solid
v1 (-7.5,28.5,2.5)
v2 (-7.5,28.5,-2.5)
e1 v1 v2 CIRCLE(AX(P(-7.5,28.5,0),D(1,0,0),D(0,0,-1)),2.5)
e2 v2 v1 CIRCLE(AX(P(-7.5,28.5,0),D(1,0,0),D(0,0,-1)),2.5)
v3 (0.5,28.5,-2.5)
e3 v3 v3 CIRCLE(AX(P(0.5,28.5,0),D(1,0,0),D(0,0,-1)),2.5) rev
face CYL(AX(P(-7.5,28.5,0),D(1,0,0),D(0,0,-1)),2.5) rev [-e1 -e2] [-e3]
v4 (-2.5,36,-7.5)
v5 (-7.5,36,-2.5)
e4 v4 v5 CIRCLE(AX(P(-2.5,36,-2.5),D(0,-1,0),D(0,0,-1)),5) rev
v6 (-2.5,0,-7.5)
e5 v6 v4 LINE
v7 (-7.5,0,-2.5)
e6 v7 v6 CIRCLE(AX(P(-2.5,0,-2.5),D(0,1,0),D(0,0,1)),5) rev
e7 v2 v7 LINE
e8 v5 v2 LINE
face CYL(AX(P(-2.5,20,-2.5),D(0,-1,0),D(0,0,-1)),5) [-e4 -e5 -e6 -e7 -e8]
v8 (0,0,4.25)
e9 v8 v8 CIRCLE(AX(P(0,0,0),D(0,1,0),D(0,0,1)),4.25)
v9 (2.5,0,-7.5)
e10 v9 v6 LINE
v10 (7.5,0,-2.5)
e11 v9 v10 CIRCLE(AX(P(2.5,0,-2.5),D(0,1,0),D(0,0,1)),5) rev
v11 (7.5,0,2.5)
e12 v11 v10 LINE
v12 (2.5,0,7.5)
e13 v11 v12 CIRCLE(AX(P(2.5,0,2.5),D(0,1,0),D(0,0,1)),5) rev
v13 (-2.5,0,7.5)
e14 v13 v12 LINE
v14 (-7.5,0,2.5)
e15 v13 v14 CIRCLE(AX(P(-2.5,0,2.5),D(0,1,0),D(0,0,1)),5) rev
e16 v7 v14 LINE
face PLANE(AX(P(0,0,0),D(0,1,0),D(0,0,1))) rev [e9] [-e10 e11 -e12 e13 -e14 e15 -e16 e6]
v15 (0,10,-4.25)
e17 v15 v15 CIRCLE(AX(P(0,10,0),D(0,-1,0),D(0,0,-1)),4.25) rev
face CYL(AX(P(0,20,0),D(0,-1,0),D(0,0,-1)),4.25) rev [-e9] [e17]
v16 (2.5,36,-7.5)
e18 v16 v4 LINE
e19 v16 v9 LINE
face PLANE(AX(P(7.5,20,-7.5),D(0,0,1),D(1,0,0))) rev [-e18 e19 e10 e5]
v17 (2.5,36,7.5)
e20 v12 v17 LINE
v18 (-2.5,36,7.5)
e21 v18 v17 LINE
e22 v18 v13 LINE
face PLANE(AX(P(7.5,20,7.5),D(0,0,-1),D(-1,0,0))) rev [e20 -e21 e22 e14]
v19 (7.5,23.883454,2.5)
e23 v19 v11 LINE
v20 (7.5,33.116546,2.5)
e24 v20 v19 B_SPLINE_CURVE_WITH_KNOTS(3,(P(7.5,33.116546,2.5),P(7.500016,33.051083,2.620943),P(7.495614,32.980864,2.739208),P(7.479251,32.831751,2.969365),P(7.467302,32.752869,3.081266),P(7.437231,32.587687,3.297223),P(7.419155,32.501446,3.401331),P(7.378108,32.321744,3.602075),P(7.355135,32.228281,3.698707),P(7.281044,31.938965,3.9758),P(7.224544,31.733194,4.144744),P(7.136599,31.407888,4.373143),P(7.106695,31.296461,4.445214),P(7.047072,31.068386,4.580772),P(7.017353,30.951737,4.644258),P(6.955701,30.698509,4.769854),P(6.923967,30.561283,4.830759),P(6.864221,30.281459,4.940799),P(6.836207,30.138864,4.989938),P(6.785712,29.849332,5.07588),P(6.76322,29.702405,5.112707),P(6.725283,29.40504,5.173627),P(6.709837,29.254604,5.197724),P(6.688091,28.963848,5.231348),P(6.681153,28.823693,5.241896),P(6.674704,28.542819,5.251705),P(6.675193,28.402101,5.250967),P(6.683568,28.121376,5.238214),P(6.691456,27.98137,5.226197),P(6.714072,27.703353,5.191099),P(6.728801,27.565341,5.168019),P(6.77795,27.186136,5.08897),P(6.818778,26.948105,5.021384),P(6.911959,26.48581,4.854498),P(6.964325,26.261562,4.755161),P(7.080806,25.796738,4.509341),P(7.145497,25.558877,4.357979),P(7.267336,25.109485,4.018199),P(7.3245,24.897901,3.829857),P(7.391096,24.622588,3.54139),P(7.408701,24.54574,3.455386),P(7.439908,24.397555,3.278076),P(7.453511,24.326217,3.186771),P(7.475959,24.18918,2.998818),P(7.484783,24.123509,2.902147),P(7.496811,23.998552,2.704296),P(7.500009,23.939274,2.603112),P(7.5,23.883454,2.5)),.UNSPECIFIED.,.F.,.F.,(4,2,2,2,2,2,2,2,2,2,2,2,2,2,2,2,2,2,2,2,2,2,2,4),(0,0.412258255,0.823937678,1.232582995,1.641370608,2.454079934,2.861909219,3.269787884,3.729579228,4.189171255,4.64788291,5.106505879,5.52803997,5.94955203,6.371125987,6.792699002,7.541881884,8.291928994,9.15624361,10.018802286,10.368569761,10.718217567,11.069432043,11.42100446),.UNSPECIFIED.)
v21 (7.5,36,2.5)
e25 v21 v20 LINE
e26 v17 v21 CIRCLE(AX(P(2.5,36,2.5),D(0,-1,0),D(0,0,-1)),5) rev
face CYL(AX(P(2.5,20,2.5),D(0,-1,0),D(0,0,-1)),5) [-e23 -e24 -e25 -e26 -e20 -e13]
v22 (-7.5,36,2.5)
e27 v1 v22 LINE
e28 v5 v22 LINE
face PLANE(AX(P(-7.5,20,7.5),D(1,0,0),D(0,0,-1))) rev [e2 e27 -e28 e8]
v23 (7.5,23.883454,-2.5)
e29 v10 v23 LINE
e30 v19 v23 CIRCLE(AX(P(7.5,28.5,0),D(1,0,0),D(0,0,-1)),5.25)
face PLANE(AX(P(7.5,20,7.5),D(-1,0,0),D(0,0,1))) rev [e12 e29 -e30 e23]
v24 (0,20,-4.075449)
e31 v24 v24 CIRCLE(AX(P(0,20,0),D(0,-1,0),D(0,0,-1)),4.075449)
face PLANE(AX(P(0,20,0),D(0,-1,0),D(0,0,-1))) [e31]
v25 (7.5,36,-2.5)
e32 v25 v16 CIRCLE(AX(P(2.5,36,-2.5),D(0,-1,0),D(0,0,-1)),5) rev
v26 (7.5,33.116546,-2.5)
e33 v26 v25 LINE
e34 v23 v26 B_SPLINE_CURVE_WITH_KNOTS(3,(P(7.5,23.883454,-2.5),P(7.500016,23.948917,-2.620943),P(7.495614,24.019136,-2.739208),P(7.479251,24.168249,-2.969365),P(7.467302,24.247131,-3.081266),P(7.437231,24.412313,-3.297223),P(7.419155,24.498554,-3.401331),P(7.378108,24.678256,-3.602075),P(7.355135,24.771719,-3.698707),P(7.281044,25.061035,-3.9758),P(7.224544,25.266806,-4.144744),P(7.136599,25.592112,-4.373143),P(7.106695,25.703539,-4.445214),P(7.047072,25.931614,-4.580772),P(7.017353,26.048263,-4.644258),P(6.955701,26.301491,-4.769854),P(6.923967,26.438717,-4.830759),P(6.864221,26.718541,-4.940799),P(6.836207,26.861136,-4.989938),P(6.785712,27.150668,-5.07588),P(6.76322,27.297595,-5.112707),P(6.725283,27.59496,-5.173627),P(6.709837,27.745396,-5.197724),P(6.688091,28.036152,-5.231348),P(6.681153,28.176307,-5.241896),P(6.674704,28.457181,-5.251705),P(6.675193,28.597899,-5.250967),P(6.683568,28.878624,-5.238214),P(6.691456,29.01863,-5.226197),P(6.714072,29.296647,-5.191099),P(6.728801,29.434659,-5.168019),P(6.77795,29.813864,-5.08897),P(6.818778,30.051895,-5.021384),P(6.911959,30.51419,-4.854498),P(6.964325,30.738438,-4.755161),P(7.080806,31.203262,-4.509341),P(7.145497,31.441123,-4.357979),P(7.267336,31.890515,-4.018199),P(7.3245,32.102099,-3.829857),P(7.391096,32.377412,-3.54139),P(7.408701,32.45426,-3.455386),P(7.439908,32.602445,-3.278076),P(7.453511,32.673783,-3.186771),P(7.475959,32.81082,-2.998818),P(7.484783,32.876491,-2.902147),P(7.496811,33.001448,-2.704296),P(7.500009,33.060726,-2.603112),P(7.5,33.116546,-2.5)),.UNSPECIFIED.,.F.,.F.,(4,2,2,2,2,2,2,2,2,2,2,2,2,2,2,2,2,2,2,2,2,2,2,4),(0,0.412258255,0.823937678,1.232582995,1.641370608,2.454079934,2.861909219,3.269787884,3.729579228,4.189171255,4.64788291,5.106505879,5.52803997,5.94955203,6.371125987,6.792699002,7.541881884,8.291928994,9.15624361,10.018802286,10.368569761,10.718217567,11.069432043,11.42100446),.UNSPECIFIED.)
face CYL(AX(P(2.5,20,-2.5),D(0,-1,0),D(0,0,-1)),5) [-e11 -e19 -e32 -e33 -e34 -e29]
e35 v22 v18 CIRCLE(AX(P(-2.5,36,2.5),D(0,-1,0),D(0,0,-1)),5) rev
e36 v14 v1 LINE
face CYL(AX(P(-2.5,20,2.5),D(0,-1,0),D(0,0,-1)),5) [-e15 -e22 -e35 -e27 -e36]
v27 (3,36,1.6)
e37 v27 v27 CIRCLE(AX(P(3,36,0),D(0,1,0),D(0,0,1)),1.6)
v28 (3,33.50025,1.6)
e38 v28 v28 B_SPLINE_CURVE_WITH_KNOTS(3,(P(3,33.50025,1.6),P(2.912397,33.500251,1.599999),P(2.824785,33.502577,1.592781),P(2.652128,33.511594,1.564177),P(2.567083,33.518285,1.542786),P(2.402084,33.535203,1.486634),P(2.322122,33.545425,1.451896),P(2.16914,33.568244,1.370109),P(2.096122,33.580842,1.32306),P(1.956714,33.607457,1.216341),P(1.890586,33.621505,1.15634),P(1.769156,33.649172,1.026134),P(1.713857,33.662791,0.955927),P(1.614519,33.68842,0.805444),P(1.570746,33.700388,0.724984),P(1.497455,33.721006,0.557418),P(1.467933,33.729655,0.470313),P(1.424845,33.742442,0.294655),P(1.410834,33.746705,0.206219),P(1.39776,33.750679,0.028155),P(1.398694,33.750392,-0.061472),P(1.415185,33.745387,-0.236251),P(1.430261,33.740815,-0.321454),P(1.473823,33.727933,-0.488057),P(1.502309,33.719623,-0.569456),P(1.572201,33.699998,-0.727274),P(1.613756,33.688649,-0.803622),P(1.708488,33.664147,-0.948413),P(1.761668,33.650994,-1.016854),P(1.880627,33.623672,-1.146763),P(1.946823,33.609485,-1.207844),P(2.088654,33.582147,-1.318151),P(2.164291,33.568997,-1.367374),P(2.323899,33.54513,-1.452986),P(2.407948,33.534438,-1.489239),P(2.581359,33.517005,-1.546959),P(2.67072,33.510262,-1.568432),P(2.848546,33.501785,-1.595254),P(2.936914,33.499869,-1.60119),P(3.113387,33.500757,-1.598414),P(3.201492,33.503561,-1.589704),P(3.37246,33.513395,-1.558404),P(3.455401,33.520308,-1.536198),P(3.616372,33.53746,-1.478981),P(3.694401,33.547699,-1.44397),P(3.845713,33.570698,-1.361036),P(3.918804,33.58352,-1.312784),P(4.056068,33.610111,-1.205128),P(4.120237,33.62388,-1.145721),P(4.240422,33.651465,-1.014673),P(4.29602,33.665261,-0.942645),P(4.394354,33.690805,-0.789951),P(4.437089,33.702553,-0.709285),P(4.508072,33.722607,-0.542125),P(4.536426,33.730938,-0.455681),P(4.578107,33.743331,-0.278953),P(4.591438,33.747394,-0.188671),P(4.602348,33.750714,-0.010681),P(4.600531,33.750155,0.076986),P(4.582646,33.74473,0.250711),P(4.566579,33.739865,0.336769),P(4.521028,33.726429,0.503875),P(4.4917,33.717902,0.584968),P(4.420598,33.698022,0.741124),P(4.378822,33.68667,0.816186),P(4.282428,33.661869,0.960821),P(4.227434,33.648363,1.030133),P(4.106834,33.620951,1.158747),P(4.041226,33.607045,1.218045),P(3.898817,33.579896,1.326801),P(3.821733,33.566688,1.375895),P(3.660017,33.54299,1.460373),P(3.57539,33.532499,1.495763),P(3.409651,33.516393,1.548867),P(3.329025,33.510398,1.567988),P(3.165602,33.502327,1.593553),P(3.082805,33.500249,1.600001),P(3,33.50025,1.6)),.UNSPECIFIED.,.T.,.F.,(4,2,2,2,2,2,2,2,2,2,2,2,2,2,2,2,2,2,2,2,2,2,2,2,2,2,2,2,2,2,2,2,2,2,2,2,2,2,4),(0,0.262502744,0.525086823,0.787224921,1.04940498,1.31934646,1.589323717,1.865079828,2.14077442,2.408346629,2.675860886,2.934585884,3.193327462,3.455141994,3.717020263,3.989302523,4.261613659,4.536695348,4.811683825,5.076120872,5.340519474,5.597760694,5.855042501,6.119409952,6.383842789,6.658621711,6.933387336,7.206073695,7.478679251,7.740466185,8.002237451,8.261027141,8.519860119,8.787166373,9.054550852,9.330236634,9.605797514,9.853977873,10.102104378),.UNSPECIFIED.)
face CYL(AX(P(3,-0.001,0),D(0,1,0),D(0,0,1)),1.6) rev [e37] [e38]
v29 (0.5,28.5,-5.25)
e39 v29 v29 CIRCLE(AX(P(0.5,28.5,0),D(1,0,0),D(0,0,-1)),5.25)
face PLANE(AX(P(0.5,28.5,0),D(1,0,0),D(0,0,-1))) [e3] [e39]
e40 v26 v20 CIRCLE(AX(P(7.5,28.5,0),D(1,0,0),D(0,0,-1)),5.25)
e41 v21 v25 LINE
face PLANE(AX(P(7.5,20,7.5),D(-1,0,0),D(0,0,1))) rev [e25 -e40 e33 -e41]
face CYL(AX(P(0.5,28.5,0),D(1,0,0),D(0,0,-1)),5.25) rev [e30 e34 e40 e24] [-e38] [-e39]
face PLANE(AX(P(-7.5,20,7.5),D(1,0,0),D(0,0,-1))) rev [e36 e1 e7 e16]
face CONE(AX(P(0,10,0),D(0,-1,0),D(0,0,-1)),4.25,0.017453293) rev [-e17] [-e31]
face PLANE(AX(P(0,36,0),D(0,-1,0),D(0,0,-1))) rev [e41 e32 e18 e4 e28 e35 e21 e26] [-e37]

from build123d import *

# Parameters (mm, degrees)
SKETCH1_W               = 15
SKETCH1_H               = 15
SKETCH1_R               = 4.25
BOSS_EXTRUDE1_DEPTH     = 20
SKETCH2_W               = 15
SKETCH2_H               = 15
BOSS_EXTRUDE2_DEPTH     = 16
SKETCH3_R               = 2.5
CUT_EXTRUDE1_DEPTH      = 40.714606885
FILLET1_R               = 5
SKETCH4_R               = 5.25
CUT_EXTRUDE2_DEPTH      = 7
CUT_EXTRUDE3_REACH      = 39.53
CUT_EXTRUDE3_END_RADIUS = 5.25
SKETCH5_R               = 1.6
CHAMFER1_SIZE           = 10
CHAMFER1_SIZE2          = 0.174550649


with BuildPart() as part:
    # Sketch1 → Boss-Extrude1 (new body)
    with BuildSketch(Plane(origin=(0, 0, 0), x_dir=(1, 0, 0), z_dir=(0, 1, 0))):
        Rectangle(SKETCH1_W, SKETCH1_H)
        with Locations(Location((0, 0, 0), (0, 0, 270))):
            Circle(SKETCH1_R, mode=Mode.SUBTRACT)
    extrude(amount=BOSS_EXTRUDE1_DEPTH)

    # Sketch2 → Boss-Extrude2 (add)
    with BuildSketch(Plane(origin=(0, 20, 0), x_dir=(1, 0, 0), z_dir=(0, 1, 0))):
        Rectangle(SKETCH2_W, SKETCH2_H)
    extrude(amount=BOSS_EXTRUDE2_DEPTH)

    # Sketch3 → Cut-Extrude1 (cut, through all)
    with BuildSketch(Plane(origin=(7.5, 0, 0), x_dir=(0, 0, -1), z_dir=(1, 0, 0))):
        with Locations((0, 28.5)):
            Circle(SKETCH3_R)
    extrude(amount=-CUT_EXTRUDE1_DEPTH, mode=Mode.SUBTRACT)

    # Fillet1
    fillet1_edges = [part.edges().sort_by_distance(p)[0] for p in [
        (-7.5, 18, -7.5),
        (7.5, 18, -7.5),
        (7.5, 18, 7.5),
        (-7.5, 18, 7.5),
    ]]
    fillet(fillet1_edges, radius=FILLET1_R - 0.0001)  # a hair under: the kernel refuses the full size

    # Sketch4 → Cut-Extrude2 (cut)
    with BuildSketch(Plane(origin=(7.5, 0, 0), x_dir=(0, 0, -1), z_dir=(1, 0, 0))):
        with Locations((0, 28.5)):
            Circle(SKETCH4_R)
    extrude(amount=-CUT_EXTRUDE2_DEPTH, mode=Mode.SUBTRACT)

    # Cut-Extrude3: up to this cylinder (the profile starts outside it)
    cut_extrude3_end = Plane(origin=(3, 28.5, 0), z_dir=(1, 0, 0)) * Cylinder(CUT_EXTRUDE3_END_RADIUS, 90.56, mode=Mode.PRIVATE)
    # Sketch5 → Cut-Extrude3 (cut, up to the surface)
    with BuildSketch(Plane(origin=(0, 36, 0), x_dir=(1, 0, 0), z_dir=(0, 1, 0)), mode=Mode.PRIVATE) as cut_extrude3_sk1:
        with Locations(Location((3, 0, 0), (0, 0, 270))):
            Circle(SKETCH5_R)
    cut_extrude3_tool1 = extrude(cut_extrude3_sk1.sketch, amount=-CUT_EXTRUDE3_REACH, mode=Mode.PRIVATE) - cut_extrude3_end
    add(cut_extrude3_tool1.solids().sort_by_distance((3, 36, 0))[0], mode=Mode.SUBTRACT)

    # Chamfer1
    chamfer1_edges = [part.edges().sort_by_distance(p)[0] for p in [
        (0, 20, -4.25),
    ]]
    chamfer1_side = [part.faces().sort_by_distance(p)[0] for p in [
        (0, 10, -4.25),
    ]]
    chamfer(chamfer1_edges, length=CHAMFER1_SIZE, length2=CHAMFER1_SIZE2, reference=chamfer1_side[0])


solid = part.part
